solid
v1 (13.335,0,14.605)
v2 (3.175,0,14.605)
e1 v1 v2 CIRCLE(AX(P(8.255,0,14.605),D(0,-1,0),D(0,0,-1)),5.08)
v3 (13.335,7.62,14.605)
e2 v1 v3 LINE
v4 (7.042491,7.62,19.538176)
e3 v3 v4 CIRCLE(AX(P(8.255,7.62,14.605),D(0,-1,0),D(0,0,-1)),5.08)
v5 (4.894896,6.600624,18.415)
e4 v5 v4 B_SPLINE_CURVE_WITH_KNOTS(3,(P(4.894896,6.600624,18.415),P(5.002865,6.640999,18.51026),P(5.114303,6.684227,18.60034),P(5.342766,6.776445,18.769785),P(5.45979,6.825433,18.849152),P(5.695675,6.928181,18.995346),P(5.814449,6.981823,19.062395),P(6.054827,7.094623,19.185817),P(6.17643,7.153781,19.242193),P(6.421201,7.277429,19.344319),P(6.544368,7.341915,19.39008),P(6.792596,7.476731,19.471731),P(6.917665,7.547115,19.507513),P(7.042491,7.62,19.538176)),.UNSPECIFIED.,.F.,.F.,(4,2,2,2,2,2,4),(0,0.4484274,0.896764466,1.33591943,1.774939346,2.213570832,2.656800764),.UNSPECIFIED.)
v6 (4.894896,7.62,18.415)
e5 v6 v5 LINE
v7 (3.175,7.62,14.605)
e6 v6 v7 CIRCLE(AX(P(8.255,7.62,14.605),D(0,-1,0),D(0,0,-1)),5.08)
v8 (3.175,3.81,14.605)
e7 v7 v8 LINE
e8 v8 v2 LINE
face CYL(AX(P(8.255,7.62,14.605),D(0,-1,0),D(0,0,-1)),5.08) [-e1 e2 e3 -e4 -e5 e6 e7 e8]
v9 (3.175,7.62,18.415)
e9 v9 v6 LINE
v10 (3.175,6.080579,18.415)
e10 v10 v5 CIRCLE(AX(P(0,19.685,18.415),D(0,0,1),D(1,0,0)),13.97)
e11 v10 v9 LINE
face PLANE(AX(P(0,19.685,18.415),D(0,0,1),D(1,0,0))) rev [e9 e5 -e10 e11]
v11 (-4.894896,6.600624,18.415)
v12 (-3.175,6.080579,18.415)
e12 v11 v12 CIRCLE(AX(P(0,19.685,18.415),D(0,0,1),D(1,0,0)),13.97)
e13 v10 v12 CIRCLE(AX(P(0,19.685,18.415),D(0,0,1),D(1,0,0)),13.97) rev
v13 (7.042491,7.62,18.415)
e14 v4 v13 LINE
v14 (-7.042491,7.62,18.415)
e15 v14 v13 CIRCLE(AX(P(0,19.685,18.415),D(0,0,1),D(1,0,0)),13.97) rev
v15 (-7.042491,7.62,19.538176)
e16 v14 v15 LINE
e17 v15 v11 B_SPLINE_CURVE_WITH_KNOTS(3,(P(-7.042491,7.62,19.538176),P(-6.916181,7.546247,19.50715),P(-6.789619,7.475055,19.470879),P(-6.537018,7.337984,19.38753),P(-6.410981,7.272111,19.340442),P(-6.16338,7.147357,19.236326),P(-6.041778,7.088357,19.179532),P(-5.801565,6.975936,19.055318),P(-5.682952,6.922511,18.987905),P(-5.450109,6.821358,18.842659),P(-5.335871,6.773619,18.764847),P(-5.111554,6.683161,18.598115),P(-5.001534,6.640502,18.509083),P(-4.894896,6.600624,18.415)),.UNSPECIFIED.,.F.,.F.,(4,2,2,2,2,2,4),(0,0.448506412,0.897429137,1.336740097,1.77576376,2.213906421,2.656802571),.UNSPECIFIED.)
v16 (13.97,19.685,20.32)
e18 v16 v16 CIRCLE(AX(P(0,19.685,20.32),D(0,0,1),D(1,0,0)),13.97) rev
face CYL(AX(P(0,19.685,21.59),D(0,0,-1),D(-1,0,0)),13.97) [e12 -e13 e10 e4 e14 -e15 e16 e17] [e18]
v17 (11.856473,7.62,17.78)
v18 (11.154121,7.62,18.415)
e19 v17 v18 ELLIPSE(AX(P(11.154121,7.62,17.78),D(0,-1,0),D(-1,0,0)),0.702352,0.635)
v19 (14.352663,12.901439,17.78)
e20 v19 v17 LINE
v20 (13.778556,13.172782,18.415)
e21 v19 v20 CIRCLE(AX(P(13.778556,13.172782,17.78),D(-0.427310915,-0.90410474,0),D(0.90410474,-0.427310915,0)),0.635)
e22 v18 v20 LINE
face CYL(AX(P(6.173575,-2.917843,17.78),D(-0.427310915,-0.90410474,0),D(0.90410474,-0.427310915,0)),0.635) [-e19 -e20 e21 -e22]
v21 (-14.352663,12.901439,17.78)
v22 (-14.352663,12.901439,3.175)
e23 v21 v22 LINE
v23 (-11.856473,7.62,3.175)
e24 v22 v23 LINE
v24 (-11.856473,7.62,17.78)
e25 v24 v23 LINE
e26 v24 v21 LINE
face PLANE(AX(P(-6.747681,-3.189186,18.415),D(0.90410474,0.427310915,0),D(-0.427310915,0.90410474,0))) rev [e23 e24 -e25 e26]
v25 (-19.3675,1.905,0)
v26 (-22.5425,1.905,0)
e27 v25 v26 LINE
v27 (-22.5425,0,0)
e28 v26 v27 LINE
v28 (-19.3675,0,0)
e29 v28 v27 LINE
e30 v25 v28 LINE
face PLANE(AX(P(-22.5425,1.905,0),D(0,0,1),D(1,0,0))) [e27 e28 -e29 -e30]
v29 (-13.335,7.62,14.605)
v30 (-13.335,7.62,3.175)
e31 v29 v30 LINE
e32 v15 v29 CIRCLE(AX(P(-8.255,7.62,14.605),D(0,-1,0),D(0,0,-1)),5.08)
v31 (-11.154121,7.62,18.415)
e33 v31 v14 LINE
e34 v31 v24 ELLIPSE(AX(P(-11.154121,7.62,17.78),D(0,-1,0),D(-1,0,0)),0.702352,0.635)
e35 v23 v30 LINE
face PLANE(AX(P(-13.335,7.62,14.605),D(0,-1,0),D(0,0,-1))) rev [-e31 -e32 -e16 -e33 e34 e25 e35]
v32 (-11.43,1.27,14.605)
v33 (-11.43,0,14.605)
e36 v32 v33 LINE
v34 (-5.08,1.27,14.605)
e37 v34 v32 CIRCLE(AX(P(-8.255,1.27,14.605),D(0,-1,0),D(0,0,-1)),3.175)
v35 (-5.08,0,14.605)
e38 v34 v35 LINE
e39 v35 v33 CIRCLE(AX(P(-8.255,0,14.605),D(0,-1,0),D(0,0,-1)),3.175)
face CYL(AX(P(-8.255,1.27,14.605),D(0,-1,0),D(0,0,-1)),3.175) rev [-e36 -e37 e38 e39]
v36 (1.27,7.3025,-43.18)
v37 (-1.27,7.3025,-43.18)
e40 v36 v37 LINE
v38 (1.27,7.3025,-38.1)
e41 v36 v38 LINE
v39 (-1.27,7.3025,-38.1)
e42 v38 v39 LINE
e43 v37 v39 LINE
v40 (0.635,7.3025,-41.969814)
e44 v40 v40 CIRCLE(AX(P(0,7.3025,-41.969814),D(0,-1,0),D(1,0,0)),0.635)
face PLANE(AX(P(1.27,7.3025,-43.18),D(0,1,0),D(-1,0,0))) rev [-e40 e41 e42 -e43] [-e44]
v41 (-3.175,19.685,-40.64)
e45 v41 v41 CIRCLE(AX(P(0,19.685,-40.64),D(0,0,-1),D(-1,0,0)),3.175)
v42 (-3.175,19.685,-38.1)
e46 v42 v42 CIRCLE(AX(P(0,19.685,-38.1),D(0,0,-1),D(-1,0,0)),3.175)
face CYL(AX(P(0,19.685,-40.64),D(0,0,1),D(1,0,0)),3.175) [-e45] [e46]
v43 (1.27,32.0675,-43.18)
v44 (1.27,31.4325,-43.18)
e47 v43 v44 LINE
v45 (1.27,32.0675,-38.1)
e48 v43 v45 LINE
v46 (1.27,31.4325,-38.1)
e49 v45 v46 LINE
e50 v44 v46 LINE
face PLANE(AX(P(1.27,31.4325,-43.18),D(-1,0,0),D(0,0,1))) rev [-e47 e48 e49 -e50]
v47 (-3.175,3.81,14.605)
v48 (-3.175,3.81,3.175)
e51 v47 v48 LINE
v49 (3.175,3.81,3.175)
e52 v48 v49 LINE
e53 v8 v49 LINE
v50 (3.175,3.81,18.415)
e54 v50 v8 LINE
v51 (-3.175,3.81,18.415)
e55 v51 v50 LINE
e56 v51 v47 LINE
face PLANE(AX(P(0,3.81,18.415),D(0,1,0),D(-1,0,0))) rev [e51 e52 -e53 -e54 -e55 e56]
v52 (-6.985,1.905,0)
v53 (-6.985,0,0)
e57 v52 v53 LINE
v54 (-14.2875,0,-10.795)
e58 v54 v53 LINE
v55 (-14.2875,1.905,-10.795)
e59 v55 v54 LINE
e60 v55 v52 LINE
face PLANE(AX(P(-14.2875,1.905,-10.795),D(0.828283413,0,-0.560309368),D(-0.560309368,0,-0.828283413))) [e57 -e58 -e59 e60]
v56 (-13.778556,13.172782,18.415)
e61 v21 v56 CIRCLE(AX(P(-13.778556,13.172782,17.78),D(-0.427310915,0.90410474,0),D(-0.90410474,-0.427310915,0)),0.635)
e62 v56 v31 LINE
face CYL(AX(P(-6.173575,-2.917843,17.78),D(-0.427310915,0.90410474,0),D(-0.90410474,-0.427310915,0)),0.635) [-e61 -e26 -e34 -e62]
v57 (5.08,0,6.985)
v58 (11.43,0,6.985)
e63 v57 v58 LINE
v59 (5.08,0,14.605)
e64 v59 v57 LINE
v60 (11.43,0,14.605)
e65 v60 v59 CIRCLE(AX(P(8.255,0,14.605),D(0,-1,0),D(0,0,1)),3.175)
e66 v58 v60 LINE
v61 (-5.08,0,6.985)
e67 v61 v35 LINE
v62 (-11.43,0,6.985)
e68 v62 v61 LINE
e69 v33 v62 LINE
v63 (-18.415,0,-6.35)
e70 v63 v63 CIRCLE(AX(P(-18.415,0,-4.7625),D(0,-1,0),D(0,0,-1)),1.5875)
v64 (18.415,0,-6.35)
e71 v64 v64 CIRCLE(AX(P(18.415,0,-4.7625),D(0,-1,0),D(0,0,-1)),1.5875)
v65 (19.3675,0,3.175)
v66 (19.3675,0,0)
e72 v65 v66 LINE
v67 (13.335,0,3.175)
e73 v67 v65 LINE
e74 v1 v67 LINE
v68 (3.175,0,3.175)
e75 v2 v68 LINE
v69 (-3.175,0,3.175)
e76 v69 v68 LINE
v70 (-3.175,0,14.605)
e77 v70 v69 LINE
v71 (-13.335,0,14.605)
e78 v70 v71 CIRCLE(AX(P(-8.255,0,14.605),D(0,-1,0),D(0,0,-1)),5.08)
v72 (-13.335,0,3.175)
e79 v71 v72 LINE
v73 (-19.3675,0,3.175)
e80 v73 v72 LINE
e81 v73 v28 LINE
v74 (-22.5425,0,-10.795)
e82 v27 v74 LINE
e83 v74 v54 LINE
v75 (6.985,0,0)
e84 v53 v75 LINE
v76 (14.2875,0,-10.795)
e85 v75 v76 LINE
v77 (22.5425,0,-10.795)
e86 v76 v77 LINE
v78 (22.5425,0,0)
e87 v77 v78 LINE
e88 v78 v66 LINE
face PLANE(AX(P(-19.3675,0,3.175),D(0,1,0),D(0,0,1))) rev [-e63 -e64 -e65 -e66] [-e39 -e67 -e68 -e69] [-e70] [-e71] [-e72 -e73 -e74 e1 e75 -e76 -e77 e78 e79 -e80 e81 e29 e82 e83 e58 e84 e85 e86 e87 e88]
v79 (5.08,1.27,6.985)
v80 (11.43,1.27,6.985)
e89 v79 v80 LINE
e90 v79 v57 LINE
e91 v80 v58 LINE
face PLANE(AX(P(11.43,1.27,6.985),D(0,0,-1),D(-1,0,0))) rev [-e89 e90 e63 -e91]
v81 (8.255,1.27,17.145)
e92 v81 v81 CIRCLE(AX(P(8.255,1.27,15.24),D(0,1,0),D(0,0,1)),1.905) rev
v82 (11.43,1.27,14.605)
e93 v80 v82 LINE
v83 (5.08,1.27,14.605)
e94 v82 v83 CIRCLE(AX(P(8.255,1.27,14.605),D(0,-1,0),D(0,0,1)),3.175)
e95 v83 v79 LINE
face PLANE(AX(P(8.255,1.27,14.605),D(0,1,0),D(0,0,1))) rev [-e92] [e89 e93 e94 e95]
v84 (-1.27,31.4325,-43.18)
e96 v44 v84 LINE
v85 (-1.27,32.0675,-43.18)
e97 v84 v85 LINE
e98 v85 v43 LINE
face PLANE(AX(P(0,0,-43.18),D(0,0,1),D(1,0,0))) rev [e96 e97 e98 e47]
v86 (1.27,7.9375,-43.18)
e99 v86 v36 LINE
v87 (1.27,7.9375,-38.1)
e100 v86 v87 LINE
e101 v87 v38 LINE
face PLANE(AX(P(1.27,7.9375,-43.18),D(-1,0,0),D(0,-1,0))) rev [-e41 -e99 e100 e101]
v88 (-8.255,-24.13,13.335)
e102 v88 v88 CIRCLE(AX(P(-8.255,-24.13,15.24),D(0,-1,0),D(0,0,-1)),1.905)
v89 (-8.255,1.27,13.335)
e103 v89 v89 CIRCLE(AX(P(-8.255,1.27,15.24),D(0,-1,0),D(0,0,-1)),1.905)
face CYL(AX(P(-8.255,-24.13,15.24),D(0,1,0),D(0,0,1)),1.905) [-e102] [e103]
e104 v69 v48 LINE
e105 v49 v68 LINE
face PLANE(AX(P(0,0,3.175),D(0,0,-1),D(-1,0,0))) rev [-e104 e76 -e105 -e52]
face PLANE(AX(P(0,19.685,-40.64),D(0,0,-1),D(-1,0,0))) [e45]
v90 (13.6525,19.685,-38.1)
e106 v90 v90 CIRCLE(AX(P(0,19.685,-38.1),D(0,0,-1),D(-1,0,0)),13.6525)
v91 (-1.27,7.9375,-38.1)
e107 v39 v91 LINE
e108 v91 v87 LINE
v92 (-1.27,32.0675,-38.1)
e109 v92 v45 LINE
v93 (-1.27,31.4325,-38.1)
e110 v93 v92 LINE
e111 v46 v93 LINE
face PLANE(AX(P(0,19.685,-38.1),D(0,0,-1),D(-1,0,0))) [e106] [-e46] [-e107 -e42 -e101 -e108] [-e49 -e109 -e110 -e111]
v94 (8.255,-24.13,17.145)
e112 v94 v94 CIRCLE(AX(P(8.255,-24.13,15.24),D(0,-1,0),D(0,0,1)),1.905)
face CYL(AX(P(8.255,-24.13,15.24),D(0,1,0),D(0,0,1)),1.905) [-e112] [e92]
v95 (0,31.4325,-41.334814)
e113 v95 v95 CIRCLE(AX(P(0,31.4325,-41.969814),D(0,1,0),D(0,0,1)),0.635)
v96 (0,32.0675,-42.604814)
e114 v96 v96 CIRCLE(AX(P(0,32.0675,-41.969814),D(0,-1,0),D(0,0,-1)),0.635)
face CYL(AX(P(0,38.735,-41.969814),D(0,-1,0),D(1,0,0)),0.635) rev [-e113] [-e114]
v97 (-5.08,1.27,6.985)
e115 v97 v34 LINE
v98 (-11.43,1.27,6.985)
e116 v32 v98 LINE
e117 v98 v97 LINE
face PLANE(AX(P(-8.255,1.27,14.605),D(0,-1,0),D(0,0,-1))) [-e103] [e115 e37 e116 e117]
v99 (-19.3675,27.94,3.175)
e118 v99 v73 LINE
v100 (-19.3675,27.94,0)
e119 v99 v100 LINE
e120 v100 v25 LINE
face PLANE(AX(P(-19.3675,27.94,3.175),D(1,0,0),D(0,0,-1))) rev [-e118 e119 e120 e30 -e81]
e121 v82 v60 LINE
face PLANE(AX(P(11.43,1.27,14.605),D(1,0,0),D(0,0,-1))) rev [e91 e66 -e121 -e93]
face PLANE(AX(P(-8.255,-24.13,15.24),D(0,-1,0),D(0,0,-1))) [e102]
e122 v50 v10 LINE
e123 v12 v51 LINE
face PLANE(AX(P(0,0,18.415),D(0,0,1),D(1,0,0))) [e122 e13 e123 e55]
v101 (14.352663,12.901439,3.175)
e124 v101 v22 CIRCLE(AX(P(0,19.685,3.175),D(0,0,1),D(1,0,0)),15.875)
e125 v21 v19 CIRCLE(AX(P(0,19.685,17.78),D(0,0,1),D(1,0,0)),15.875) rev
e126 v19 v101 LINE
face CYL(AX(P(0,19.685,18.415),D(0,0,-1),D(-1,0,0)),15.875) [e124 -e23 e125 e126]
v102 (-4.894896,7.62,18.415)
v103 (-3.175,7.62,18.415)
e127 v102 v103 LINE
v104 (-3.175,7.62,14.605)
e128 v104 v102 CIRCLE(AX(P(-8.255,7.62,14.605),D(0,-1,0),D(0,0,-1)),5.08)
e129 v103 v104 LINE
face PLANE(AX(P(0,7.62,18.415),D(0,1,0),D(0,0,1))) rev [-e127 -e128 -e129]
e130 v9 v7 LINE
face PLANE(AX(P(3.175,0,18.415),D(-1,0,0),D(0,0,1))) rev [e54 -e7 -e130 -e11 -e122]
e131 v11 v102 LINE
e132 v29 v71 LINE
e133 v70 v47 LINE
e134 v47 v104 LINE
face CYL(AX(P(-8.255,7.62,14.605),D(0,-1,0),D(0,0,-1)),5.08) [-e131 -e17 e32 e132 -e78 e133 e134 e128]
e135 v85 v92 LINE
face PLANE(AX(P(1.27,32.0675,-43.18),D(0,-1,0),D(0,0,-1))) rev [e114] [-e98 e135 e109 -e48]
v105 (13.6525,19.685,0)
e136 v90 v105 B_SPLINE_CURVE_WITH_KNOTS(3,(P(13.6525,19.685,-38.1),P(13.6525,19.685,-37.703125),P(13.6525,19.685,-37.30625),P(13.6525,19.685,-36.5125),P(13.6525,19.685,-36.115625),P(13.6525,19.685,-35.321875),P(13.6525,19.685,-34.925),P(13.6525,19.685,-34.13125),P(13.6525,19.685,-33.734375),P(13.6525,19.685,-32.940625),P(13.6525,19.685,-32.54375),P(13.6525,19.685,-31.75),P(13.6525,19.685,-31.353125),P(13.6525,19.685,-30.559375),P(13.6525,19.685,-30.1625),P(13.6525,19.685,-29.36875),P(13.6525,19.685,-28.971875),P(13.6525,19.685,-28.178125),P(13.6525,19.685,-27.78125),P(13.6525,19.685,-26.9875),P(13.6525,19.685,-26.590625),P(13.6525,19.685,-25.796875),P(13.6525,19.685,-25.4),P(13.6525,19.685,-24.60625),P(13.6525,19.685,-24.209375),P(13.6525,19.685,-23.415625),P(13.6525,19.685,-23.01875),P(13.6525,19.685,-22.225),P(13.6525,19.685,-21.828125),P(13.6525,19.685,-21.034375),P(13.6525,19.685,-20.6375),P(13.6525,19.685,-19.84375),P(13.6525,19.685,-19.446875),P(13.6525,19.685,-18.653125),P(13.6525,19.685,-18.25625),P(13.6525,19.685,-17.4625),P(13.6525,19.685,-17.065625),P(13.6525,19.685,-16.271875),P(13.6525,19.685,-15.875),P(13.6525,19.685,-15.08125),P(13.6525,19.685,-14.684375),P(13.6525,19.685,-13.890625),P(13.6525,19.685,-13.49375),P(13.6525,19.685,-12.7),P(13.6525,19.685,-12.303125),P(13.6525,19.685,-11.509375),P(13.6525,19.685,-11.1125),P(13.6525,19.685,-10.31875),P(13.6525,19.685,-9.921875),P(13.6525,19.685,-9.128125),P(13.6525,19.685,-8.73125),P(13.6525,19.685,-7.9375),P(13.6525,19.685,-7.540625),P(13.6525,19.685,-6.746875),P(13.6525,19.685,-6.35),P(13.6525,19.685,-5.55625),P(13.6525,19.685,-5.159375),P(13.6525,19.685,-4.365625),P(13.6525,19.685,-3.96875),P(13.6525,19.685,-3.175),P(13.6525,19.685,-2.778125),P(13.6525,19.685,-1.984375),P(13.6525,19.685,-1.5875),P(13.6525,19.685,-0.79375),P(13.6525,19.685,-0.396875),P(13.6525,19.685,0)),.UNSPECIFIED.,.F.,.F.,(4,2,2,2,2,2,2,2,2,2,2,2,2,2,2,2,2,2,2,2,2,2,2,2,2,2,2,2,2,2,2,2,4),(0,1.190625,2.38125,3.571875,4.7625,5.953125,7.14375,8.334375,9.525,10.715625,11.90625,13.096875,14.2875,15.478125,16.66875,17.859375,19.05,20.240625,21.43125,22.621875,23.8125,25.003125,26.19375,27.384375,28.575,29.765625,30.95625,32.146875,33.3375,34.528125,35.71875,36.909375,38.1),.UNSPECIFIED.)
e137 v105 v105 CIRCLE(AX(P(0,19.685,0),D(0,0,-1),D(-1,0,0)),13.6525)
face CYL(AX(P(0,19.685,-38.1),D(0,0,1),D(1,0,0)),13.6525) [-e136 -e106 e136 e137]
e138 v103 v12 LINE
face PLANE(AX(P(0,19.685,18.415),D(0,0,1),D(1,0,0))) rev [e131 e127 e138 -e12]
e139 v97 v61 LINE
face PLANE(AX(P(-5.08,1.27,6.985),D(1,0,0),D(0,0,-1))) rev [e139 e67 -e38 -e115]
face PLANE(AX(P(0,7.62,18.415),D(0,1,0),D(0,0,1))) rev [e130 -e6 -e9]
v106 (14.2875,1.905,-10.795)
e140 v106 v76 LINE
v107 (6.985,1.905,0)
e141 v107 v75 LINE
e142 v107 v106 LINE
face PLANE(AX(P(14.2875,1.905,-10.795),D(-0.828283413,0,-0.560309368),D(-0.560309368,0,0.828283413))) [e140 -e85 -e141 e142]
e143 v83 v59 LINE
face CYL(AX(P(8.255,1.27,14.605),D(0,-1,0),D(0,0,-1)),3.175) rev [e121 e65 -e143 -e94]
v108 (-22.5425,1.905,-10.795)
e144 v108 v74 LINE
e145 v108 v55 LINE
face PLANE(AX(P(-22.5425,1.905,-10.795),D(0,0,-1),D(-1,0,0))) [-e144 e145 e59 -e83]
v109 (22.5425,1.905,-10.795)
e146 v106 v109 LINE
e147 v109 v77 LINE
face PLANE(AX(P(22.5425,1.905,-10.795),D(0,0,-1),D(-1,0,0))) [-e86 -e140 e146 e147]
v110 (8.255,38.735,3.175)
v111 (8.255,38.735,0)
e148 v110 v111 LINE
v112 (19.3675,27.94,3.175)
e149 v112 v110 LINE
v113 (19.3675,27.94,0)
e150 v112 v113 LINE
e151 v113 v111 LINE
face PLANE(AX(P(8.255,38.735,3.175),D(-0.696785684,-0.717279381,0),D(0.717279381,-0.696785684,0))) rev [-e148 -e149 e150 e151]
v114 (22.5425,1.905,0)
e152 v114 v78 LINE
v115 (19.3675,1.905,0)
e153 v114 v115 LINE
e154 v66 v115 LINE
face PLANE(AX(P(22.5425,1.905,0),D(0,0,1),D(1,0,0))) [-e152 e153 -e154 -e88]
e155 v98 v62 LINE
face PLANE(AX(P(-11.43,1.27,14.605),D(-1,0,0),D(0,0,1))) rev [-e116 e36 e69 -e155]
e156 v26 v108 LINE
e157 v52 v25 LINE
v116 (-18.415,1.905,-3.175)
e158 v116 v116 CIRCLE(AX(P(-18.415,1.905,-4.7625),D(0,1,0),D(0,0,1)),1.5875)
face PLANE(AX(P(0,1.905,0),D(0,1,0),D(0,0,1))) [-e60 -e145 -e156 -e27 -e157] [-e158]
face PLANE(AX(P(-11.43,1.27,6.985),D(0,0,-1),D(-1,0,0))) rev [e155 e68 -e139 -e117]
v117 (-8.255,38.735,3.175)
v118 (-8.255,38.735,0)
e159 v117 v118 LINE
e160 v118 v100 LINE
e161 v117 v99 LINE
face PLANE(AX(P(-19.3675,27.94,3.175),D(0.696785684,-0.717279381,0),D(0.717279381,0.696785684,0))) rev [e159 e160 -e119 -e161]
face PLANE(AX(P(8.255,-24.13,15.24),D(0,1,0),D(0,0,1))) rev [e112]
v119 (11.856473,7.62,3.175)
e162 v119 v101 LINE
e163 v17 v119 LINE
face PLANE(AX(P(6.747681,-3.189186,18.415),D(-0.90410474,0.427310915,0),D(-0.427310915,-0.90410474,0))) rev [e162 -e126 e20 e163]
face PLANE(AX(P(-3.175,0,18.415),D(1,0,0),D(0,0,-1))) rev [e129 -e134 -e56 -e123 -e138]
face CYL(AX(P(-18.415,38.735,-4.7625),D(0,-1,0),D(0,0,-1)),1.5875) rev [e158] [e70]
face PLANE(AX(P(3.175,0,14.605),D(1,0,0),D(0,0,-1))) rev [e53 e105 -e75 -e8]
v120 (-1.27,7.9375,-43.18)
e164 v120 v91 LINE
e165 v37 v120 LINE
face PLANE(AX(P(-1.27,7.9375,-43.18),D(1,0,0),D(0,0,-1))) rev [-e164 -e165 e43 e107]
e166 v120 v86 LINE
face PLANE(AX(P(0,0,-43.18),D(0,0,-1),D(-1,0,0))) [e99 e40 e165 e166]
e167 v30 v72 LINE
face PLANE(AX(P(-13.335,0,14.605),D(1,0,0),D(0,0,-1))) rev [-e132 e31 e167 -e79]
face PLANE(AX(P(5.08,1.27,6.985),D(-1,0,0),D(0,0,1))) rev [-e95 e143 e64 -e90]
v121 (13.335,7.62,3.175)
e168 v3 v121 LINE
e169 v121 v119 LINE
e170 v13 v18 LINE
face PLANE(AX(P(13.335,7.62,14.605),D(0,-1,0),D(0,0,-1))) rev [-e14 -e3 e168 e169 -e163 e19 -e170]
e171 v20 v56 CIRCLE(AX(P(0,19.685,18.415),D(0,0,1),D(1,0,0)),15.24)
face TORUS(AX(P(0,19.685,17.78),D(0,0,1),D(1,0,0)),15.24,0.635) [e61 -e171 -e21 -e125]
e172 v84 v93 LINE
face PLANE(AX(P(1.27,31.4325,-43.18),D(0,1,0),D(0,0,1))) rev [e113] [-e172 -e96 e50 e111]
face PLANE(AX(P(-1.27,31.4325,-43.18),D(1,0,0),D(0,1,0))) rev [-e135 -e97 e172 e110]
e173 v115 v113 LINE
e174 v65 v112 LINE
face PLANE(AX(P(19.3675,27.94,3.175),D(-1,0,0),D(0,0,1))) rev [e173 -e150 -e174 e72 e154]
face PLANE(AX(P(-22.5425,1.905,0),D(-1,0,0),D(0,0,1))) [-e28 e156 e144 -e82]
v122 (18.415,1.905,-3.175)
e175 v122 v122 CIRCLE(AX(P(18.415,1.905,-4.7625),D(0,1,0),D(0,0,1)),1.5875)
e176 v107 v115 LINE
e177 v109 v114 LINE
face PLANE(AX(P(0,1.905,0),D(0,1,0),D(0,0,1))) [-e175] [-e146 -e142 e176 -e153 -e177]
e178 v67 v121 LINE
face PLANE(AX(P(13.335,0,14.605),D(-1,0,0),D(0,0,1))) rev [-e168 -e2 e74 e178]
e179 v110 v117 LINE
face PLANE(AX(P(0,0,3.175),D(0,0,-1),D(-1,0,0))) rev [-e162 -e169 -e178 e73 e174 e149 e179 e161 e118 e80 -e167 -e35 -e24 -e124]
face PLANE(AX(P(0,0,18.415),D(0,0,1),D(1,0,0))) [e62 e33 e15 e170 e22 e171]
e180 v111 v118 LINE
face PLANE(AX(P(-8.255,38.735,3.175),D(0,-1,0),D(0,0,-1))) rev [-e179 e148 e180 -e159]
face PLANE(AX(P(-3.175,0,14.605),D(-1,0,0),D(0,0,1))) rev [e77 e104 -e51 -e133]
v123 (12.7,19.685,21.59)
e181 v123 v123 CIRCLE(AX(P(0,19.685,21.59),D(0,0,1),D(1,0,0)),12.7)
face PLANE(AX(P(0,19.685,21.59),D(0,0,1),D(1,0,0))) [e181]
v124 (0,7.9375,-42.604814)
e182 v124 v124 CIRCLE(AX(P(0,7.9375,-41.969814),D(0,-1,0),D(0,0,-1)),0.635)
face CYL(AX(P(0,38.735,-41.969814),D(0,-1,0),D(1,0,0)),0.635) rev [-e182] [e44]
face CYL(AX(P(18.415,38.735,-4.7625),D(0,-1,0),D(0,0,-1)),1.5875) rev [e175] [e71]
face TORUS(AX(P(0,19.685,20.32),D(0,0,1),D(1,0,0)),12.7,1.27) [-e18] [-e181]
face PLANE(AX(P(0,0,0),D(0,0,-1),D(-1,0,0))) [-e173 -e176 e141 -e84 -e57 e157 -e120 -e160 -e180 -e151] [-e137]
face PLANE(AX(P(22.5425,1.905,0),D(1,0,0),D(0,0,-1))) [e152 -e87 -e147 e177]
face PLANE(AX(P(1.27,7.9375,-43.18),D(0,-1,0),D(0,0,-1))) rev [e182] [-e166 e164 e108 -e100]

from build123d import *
from build123d.topology import SkipClean

# Parameters (mm, degrees)
BOSS_EXTRUDE1_DEPTH = 3.175
SKETCH2_W           = 10.16
SKETCH2_H           = 7.62
BOSS_EXTRUDE2_DEPTH = 11.43
SKETCH3_W           = 5.08
SKETCH3_H           = 7.62
REVOLVE1_ANGLE      = 180
SKETCH4_W           = 5.08
SKETCH4_H           = 7.62
REVOLVE2_ANGLE      = 180
BOSS_EXTRUDE3_DEPTH = 15.24
SKETCH6_R           = 13.97
BOSS_EXTRUDE4_DEPTH = 3.175
FILLET1_R           = 1.27
FILLET2_R           = 0.635
BOSS_EXTRUDE5_DEPTH = 1.905
SKETCH9_R           = 1.5875
CUT_EXTRUDE1_DEPTH  = 50.746282631
CUT_EXTRUDE2_DEPTH  = 1.27
SKETCH10_R          = 1.905
BOSS_EXTRUDE6_DEPTH = 25.4
SKETCH12_R          = 13.6525
BOSS_EXTRUDE7_DEPTH = 38.1
SKETCH13_R          = 3.175
BOSS_EXTRUDE8_DEPTH = 2.54
SKETCH14_W          = 2.54
SKETCH14_H          = 0.635
BOSS_EXTRUDE9_DEPTH = 5.08
SKETCH15_R          = 0.635
CUT_EXTRUDE3_DEPTH  = 58.971361572


with BuildPart() as part:
    # Sketch1 → Boss-Extrude1 (new body)
    with BuildSketch(Plane.XY):
        Polygon((-19.3675, 27.94), (-19.3675, 0), (19.3675, 0), (19.3675, 27.94), (8.255, 38.735), (-8.255, 38.735), align=None)
    extrude(amount=BOSS_EXTRUDE1_DEPTH)

    # Sketch2 → Boss-Extrude2 (add)
    with BuildSketch(Plane.XY.offset(3.175)):
        with Locations((-8.255, 3.81)):
            Rectangle(SKETCH2_W, SKETCH2_H)
        with Locations((8.255, 3.81)):
            Rectangle(SKETCH2_W, SKETCH2_H)
    extrude(amount=BOSS_EXTRUDE2_DEPTH)

    # Sketch3 → Revolve1 (revolve)
    with SkipClean():  # the faces are left unmerged after this step: merging them gives an invalid solid
        with BuildSketch(Plane.XY.offset(14.605)):
            with Locations((-5.715, 3.81)):
                Rectangle(SKETCH3_W, SKETCH3_H)
            with Locations((-10.795, 3.81)):
                Rectangle(SKETCH3_W, SKETCH3_H)
        revolve(axis=Axis((-8.255, 7.62, 14.605), (0, -1, 0)), revolution_arc=REVOLVE1_ANGLE)
    add(part.part.scale(1), mode=Mode.REPLACE)  # the faces are merged on a copy

    # Sketch4 → Revolve2 (revolve)
    with BuildSketch(Plane.XY.offset(14.605)):
        with Locations((5.715, 3.81)):
            Rectangle(SKETCH4_W, SKETCH4_H)
    revolve(axis=Axis((8.255, 7.62, 14.605), (0, 1, 0)), revolution_arc=REVOLVE2_ANGLE)

    # Sketch5 → Boss-Extrude3 (add)
    with BuildSketch(Plane.XY.offset(3.175)):
        with BuildLine():
            ThreePointArc((14.352662754, 12.90143922), (0, 35.56), (-14.352662754, 12.90143922))
            Line((-14.352662754, 12.90143922), (-11.856473401, 7.62))
            Line((-11.856473401, 7.62), (-3.175, 7.62))
            Line((-3.175, 7.62), (-3.175, 3.81))
            Line((-3.175, 3.81), (3.175, 3.81))
            Line((3.175, 3.81), (3.175, 7.62))
            Line((3.175, 7.62), (11.856473401, 7.62))
            Line((11.856473401, 7.62), (14.352662754, 12.90143922))
        make_face()
    extrude(amount=BOSS_EXTRUDE3_DEPTH)

    # Sketch6 → Boss-Extrude4 (add)
    with BuildSketch(Plane.XY.offset(18.415)):
        with Locations(Location((0, 19.685, 0), (0, 0, 239.727358681))):
            Circle(SKETCH6_R)
    extrude(amount=BOSS_EXTRUDE4_DEPTH)

    # Fillet1
    fillet1_edges = [part.edges().sort_by_distance(p)[0] for p in [
        (7.042490682, 31.75, 21.59),
    ]]
    fillet(fillet1_edges, radius=FILLET1_R)

    # Fillet2
    # the kernel refuses this fillet: 0.635 mm, written as the material it takes off along each edge
    with BuildSketch(Plane(origin=(11.178117323, 6.184733725, 18.415), x_dir=(-0.9041047404261693, 0.4273109153051544, 0), z_dir=(0.42731091530515436, 0.9041047404261694, 0))) as fillet2_piece_1_section:
        with BuildLine():
            CenterArc((FILLET2_R, -FILLET2_R), FILLET2_R, 90, 90)
            Line((0, -FILLET2_R), (0, 0))
            Line((0, 0), (FILLET2_R, 0))
        make_face()
    fillet2_piece_1 = extrude(amount=7.429123192, mode=Mode.PRIVATE)
    fillet2_piece_1 = split(fillet2_piece_1, bisect_by=Plane(origin=(12.958569615, 7.62, 18.272124555), z_dir=(0, 1, 0)), keep=Keep.TOP, mode=Mode.PRIVATE)
    add(fillet2_piece_1, mode=Mode.SUBTRACT)
    with BuildSketch(Plane(origin=(0, 19.685, 18.415), x_dir=(0.9041047404261693, -0.42731091530515447, 0), z_dir=(-0.42731091530515447, -0.9041047404261693, 0))) as fillet2_piece_2:
        with BuildLine():
            CenterArc((15.875 - FILLET2_R, -FILLET2_R), FILLET2_R, 0, 90)
            Line((15.875, -FILLET2_R), (15.875, 0))
            Line((15.875, 0), (15.875 - FILLET2_R, 0))
        make_face()
    revolve(axis=Axis((0, 19.685, 18.415), (0, 0, 1)), revolution_arc=230.594049451, mode=Mode.SUBTRACT)
    with BuildSketch(Plane(origin=(-14.352662754, 12.90143922, 18.415), x_dir=(0.9041047404261693, 0.4273109153051546, 0), z_dir=(0.4273109153051546, -0.9041047404261694, 0))) as fillet2_piece_3_section:
        with BuildLine():
            CenterArc((FILLET2_R, -FILLET2_R), FILLET2_R, 90, 90)
            Line((0, -FILLET2_R), (0, 0))
            Line((0, 0), (FILLET2_R, 0))
        make_face()
    fillet2_piece_3 = extrude(amount=7.429123192, mode=Mode.PRIVATE)
    fillet2_piece_3 = split(fillet2_piece_3, bisect_by=Plane(origin=(-12.958569615, 7.62, 18.272124555), z_dir=(0, 1, 0)), keep=Keep.TOP, mode=Mode.PRIVATE)
    add(fillet2_piece_3, mode=Mode.SUBTRACT)

    # Sketch8 → Boss-Extrude5 (add)
    with BuildSketch(Plane.XZ):
        Polygon((-22.5425, 0), (-22.5425, -10.795), (-14.2875, -10.795), (-6.985, 0), align=None)
        Polygon((22.5425, -10.795), (14.2875, -10.795), (6.985, 0), (22.5425, 0), align=None)
    extrude(amount=-BOSS_EXTRUDE5_DEPTH)

    # Sketch9 → Cut-Extrude1 (cut, through all)
    with BuildSketch(Plane.XZ):
        with Locations(Location((18.415, -4.7625, 0), (0, 0, 270))):
            Circle(SKETCH9_R)
        with Locations(Location((-18.415, -4.7625, 0), (0, 0, 270))):
            Circle(SKETCH9_R)
    extrude(amount=-CUT_EXTRUDE1_DEPTH, mode=Mode.SUBTRACT)

    # Sketch11 → Cut-Extrude2 (cut)
    with BuildSketch(Plane.XZ):
        with BuildLine():
            Line((-11.43, 6.985), (-5.08, 6.985))
            Line((-5.08, 6.985), (-5.08, 14.605))
            ThreePointArc((-5.08, 14.605), (-8.255, 17.78), (-11.43, 14.605))
            Line((-11.43, 14.605), (-11.43, 6.985))
        make_face()
        with BuildLine():
            Line((11.43, 14.605), (11.43, 6.985))
            Line((11.43, 6.985), (5.08, 6.985))
            Line((5.08, 6.985), (5.08, 14.605))
            ThreePointArc((5.08, 14.605), (8.255, 17.78), (11.43, 14.605))
        make_face()
    extrude(amount=-CUT_EXTRUDE2_DEPTH, mode=Mode.SUBTRACT)

    # Sketch10 → Boss-Extrude6 (add)
    with BuildSketch(Plane.XZ.offset(-1.27)):
        with Locations(Location((-8.255, 15.24, 0), (0, 0, 270))):
            Circle(SKETCH10_R)
        with Locations(Location((8.255, 15.24, 0), (0, 0, 90))):
            Circle(SKETCH10_R)
    extrude(amount=BOSS_EXTRUDE6_DEPTH)

    # Sketch12 → Boss-Extrude7 (add)
    with BuildSketch(Plane(origin=(0, 0, 0), x_dir=(-1, 0, 0), z_dir=(0, 0, -1))):
        with Locations(Location((0, 19.685, 0), (0, 0, 180))):
            Circle(SKETCH12_R)
    extrude(amount=BOSS_EXTRUDE7_DEPTH)

    # Sketch13 → Boss-Extrude8 (add)
    with BuildSketch(Plane(origin=(0, 0, -38.1), x_dir=(-1, 0, 0), z_dir=(0, 0, -1))):
        with Locations((0, 19.685)):
            Circle(SKETCH13_R)
    extrude(amount=BOSS_EXTRUDE8_DEPTH)

    # Sketch14 → Boss-Extrude9 (add)
    with BuildSketch(Plane(origin=(0, 0, -38.1), x_dir=(-1, 0, 0), z_dir=(0, 0, -1))):
        with Locations((0, 31.75)):
            Rectangle(SKETCH14_W, SKETCH14_H)
        with Locations((0, 7.62)):
            Rectangle(SKETCH14_W, SKETCH14_H)
    extrude(amount=BOSS_EXTRUDE9_DEPTH)

    # Sketch15 → Cut-Extrude3 (cut, through all)
    with BuildSketch(Plane.XZ.offset(-7.3025)):
        with Locations((0, -41.96981375)):
            Circle(SKETCH15_R)
    extrude(amount=-CUT_EXTRUDE3_DEPTH, mode=Mode.SUBTRACT)


solid = part.part
